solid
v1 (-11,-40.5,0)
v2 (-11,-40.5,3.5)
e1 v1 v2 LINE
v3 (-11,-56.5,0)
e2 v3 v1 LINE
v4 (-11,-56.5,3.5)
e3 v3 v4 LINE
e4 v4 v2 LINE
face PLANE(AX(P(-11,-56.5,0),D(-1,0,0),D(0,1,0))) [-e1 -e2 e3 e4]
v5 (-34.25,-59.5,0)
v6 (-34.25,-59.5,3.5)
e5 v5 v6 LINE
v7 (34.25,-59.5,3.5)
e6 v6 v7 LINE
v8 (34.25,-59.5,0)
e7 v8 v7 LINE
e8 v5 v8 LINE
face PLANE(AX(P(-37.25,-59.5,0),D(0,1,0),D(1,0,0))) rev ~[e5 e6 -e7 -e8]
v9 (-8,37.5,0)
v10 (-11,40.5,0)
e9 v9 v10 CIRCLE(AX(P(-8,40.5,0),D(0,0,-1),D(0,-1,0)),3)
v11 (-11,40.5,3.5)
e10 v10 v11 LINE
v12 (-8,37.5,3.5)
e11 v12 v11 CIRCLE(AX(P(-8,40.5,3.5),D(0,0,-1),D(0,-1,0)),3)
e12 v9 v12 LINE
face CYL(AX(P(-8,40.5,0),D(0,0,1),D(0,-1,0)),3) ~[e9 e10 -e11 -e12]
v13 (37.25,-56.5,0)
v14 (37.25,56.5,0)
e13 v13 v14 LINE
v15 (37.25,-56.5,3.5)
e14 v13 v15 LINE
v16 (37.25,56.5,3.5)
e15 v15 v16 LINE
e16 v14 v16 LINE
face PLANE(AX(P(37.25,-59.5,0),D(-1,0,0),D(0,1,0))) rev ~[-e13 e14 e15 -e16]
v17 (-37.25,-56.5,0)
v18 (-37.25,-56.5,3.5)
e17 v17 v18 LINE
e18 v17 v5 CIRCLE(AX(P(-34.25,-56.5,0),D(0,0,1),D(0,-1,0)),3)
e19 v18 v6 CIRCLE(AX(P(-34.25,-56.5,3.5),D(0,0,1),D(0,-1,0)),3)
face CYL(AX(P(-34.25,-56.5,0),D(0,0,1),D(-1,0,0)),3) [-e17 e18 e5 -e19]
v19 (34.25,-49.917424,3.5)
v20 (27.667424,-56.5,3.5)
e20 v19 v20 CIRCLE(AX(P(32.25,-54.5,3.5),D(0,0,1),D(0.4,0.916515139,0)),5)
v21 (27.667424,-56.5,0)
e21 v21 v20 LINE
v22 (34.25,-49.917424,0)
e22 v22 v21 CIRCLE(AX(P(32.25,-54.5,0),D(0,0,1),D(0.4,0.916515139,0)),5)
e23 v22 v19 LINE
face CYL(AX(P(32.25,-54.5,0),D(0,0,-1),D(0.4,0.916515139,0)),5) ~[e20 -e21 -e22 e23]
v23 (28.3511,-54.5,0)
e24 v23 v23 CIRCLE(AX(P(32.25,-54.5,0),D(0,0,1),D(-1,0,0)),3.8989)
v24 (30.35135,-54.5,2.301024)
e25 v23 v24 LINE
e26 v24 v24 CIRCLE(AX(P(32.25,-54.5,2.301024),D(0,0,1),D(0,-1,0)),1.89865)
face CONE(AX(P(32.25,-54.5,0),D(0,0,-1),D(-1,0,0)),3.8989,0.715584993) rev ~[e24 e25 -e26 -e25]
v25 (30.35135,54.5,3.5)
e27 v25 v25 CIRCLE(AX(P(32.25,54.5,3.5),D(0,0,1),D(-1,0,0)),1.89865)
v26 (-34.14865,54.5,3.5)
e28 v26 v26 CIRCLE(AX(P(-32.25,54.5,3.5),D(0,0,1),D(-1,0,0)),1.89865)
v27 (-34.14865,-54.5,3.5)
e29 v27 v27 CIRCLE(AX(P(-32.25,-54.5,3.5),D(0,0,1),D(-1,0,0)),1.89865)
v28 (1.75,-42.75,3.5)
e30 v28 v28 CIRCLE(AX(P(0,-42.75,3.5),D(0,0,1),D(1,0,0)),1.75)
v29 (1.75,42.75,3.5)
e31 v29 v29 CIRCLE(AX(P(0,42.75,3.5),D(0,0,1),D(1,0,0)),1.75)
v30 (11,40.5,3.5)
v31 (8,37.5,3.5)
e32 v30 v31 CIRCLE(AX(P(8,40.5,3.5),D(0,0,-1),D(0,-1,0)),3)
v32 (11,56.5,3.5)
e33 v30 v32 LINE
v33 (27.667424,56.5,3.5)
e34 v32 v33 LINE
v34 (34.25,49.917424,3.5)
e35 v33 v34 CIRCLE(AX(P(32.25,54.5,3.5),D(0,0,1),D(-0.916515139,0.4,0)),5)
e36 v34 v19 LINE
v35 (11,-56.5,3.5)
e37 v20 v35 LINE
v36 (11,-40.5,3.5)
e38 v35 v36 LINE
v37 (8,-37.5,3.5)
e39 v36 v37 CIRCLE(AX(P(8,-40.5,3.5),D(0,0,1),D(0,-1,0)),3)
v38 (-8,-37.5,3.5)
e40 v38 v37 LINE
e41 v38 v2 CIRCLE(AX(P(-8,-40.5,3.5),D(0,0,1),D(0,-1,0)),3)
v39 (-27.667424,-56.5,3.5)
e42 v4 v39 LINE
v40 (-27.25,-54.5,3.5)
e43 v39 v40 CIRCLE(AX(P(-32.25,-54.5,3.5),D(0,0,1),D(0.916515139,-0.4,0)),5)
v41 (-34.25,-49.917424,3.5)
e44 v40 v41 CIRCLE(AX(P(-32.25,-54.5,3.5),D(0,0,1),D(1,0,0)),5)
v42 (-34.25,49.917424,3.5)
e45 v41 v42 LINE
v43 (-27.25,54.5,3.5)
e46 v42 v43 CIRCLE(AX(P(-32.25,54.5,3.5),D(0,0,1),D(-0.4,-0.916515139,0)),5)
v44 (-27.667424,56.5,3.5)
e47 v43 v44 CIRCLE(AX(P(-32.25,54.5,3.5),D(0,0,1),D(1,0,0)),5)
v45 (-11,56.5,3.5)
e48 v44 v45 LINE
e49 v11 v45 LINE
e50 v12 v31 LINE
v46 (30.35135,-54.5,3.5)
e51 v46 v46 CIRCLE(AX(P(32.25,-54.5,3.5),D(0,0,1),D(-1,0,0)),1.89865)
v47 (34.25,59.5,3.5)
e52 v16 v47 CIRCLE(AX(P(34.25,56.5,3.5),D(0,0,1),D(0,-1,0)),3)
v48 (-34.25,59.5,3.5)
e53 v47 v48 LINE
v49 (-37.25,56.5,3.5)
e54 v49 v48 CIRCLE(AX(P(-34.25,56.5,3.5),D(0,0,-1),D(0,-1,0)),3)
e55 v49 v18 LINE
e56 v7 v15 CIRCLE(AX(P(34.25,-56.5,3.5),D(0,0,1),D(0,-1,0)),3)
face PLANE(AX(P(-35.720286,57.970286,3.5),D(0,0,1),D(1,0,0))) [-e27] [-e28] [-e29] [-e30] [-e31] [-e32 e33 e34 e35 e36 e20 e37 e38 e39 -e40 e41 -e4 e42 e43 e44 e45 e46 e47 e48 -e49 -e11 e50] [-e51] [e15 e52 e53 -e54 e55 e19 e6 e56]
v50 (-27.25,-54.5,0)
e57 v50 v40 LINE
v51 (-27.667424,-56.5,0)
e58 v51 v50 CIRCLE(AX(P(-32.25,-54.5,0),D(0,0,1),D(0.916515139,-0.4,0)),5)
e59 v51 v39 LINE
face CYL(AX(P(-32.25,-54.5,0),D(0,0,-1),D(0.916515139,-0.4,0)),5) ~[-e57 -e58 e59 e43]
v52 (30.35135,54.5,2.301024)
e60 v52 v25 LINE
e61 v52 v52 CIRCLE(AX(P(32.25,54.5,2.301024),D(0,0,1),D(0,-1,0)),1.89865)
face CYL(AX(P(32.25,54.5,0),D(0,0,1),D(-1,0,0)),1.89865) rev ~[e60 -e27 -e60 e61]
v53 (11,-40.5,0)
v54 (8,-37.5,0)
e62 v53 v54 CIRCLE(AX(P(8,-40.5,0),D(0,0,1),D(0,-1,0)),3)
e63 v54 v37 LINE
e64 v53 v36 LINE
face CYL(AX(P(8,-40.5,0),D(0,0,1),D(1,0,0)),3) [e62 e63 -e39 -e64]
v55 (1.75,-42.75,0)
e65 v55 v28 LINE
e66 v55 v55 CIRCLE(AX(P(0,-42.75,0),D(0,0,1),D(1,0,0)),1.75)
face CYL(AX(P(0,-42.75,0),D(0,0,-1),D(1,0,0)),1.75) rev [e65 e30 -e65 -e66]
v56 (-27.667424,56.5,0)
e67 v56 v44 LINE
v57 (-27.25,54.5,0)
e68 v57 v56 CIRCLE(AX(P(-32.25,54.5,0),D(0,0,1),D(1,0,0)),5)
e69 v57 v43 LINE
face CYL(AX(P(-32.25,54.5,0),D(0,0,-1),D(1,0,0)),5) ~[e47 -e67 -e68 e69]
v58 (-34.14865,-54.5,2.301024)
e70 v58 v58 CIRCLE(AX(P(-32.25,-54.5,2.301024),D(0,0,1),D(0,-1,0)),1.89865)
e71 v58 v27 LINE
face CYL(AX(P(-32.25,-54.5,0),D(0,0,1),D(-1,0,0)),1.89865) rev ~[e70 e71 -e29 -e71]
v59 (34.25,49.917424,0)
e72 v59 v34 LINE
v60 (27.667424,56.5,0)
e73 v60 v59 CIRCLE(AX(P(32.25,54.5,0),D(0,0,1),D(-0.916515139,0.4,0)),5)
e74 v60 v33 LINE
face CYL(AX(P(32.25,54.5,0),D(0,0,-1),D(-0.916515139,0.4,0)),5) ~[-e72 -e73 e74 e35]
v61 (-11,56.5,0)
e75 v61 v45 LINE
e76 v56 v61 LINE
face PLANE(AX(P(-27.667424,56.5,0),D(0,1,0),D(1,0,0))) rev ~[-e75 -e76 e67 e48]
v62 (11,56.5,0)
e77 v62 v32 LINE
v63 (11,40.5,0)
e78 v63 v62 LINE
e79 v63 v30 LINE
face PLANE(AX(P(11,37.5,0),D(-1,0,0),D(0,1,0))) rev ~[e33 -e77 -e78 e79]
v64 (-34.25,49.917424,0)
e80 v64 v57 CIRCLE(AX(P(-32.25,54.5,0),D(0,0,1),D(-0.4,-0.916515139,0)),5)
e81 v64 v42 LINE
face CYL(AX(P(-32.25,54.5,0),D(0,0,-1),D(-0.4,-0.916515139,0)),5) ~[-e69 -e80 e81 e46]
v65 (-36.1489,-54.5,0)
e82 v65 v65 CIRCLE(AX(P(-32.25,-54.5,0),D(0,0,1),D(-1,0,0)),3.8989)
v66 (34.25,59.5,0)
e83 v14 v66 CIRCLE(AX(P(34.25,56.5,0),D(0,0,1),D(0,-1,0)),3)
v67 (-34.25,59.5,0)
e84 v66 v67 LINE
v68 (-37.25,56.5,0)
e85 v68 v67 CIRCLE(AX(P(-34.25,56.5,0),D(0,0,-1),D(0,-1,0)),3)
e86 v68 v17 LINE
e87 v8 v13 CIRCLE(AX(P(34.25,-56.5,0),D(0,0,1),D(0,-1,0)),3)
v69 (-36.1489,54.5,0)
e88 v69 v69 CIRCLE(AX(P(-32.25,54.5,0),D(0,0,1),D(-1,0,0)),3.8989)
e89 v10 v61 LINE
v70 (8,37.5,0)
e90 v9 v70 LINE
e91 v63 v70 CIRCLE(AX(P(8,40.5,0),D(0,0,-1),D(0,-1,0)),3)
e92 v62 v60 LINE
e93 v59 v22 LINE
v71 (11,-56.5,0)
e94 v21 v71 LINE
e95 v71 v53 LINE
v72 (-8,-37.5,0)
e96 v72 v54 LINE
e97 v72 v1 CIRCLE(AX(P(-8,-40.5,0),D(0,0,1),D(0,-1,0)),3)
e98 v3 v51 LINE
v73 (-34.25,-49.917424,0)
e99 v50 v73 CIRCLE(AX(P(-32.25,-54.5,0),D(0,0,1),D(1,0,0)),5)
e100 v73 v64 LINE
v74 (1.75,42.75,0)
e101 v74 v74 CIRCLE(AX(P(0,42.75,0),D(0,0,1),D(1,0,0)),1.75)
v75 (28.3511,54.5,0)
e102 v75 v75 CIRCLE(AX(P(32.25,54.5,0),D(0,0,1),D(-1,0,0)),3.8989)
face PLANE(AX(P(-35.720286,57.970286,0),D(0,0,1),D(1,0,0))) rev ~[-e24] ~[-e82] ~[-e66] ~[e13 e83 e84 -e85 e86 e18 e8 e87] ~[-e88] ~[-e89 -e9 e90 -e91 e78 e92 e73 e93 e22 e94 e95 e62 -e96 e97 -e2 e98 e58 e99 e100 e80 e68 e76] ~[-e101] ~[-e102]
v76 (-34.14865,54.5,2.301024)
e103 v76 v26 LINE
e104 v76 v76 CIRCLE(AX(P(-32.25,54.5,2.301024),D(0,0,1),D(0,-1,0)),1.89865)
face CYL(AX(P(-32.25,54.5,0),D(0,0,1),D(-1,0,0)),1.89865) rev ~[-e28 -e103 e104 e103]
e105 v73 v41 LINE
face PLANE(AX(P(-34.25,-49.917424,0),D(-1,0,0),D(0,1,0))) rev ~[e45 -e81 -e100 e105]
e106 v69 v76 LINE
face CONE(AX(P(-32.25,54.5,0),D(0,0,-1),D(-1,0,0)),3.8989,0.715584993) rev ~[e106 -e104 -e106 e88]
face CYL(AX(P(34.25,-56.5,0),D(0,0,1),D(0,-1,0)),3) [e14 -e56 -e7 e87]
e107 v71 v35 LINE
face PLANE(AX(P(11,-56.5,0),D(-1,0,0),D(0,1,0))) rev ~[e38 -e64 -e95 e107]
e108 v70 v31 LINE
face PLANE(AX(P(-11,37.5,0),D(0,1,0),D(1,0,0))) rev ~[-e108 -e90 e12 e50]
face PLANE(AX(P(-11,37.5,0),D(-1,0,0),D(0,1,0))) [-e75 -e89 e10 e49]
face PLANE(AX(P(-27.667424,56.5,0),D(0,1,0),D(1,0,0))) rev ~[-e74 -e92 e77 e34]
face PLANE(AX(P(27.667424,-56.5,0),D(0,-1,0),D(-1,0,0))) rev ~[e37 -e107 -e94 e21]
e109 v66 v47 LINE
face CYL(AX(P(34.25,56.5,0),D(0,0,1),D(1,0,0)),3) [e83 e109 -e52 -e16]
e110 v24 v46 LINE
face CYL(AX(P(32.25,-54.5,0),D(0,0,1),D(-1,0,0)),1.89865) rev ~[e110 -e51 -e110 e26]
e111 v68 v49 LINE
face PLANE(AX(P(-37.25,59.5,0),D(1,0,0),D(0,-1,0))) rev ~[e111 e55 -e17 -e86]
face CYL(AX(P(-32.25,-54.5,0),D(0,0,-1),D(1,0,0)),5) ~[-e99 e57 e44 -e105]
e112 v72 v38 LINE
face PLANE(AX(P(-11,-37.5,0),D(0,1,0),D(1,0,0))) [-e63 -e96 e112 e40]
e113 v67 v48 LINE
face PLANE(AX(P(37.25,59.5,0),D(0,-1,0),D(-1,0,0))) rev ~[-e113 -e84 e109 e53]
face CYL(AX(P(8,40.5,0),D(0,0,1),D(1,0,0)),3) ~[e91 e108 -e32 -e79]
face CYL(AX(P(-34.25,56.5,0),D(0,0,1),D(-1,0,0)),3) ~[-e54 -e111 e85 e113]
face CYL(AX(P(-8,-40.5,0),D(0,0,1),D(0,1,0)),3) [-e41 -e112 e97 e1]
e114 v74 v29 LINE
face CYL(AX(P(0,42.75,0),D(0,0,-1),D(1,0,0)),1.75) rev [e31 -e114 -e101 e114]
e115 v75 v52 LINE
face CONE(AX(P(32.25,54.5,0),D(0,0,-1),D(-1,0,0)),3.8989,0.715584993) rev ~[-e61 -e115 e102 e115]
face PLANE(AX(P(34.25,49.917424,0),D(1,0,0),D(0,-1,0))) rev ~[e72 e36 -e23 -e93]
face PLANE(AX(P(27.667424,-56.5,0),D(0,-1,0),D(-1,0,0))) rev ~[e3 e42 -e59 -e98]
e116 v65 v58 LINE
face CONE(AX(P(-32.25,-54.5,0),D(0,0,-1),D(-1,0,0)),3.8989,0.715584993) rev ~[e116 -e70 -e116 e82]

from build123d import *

# Parameters (mm, degrees)
F0_R           = 1.8985
F1_DEPTH       = 3.5
F2_R           = 3
F0_W           = 22
F0_H           = 19
F0_R_2         = 1.75
F3_DEPTH       = 3.5
F4_D           = 3.7973
F4_DEPTH       = 14.38125
F4_CSINK_D     = 7.7978
F4_CSINK_ANGLE = 82
F4_TIP         = 1.1408240143
F5_R           = 3


# Not quite as in the source:
# - a feature names something its author has since deleted; it is built from what else it names


with BuildPart() as f1:
    # F0 (on Top) → F1 (new body)
    with BuildSketch(Plane.XY):
        with BuildLine():
            Line((-32.25, 59.5), (-37.25, 59.5))
            Line((-37.25, 59.5), (-37.25, 54.5))
            ThreePointArc((-37.25, 54.5), (-35.7855339059, 58.0355339059), (-32.25, 59.5))
        make_face()
        with BuildLine():
            Line((37.25, 59.5), (32.25, 59.5))
            ThreePointArc((32.25, 59.5), (35.7855339059, 58.0355339059), (37.25, 54.5))
            Line((37.25, 54.5), (37.25, 59.5))
        make_face()
        with BuildLine():
            ThreePointArc((-32.25, -59.5), (-35.7855339059, -58.0355339059), (-37.25, -54.5))
            Line((-37.25, -54.5), (-37.25, -59.5))
            Line((-37.25, -59.5), (-32.25, -59.5))
        make_face()
        with BuildLine():
            Line((37.25, -59.5), (37.25, -54.5))
            ThreePointArc((37.25, -54.5), (35.7855339059, -58.0355339059), (32.25, -59.5))
            Line((32.25, -59.5), (37.25, -59.5))
        make_face()
        with BuildLine():
            Line((32.25, 59.5), (-32.25, 59.5))
            ThreePointArc((-32.25, 59.5), (-29.5113872125, 58.6833001327), (-27.667424305, 56.5))
            Line((-27.667424305, 56.5), (-11, 56.5))
            Line((-11, 56.5), (11, 56.5))
            Line((11, 56.5), (27.667424305, 56.5))
            ThreePointArc((27.667424305, 56.5), (29.5113872125, 58.6833001327), (32.25, 59.5))
        make_face()
        with BuildLine():
            ThreePointArc((-27.667424305, -56.5), (-29.5113872125, -58.6833001327), (-32.25, -59.5))
            Line((-32.25, -59.5), (32.25, -59.5))
            ThreePointArc((32.25, -59.5), (29.5113872125, -58.6833001327), (27.667424305, -56.5))
            Line((27.667424305, -56.5), (11, -56.5))
            Line((11, -56.5), (-11, -56.5))
            Line((-11, -56.5), (-27.667424305, -56.5))
        make_face()
        with BuildLine():
            ThreePointArc((-34.25, 49.917424305), (-36.4333001327, 51.7613872125), (-37.25, 54.5))
            Line((-37.25, 54.5), (-37.25, -54.5))
            ThreePointArc((-37.25, -54.5), (-36.4333001327, -51.7613872125), (-34.25, -49.917424305))
            Line((-34.25, -49.917424305), (-34.25, 49.917424305))
        make_face()
        with BuildLine():
            Line((37.25, -54.5), (37.25, 54.5))
            ThreePointArc((37.25, 54.5), (36.4333001327, 51.7613872125), (34.25, 49.917424305))
            Line((34.25, 49.917424305), (34.25, -49.917424305))
            ThreePointArc((34.25, -49.917424305), (36.4333001327, -51.7613872125), (37.25, -54.5))
        make_face()
        with BuildLine():
            ThreePointArc((-27.667424305, 56.5), (-29.5113872125, 58.6833001327), (-32.25, 59.5))
            ThreePointArc((-32.25, 59.5), (-35.7855339059, 58.0355339059), (-37.25, 54.5))
            ThreePointArc((-37.25, 54.5), (-36.4333001327, 51.7613872125), (-34.25, 49.917424305))
            Line((-34.25, 49.917424305), (-34.25, 56.5))
            Line((-34.25, 56.5), (-27.667424305, 56.5))
        make_face()
        with BuildLine():
            ThreePointArc((32.25, -59.5), (35.7855339059, -58.0355339059), (37.25, -54.5))
            ThreePointArc((37.25, -54.5), (36.4333001327, -51.7613872125), (34.25, -49.917424305))
            Line((34.25, -49.917424305), (34.25, -56.5))
            Line((34.25, -56.5), (27.667424305, -56.5))
            ThreePointArc((27.667424305, -56.5), (29.5113872125, -58.6833001327), (32.25, -59.5))
        make_face()
        with BuildLine():
            ThreePointArc((-27.25, 54.5), (-27.3554684353, 55.5215482184), (-27.667424305, 56.5))
            Line((-27.667424305, 56.5), (-34.25, 56.5))
            Line((-34.25, 56.5), (-34.25, 49.917424305))
            ThreePointArc((-34.25, 49.917424305), (-29.5113872125, 50.3166998673), (-27.25, 54.5))
        make_face()
        with Locations((-32.25, 54.5)):
            Circle(F0_R, mode=Mode.SUBTRACT)
        with BuildLine():
            ThreePointArc((-27.25, -54.5), (-29.5113872125, -50.3166998673), (-34.25, -49.917424305))
            Line((-34.25, -49.917424305), (-34.25, -56.5))
            Line((-34.25, -56.5), (-27.667424305, -56.5))
            ThreePointArc((-27.667424305, -56.5), (-27.3554684353, -55.5215482184), (-27.25, -54.5))
        make_face()
        with Locations((-32.25, -54.5)):
            Circle(F0_R, mode=Mode.SUBTRACT)
        with BuildLine():
            ThreePointArc((-34.25, -49.917424305), (-36.4333001327, -51.7613872125), (-37.25, -54.5))
            ThreePointArc((-37.25, -54.5), (-35.7855339059, -58.0355339059), (-32.25, -59.5))
            ThreePointArc((-32.25, -59.5), (-29.5113872125, -58.6833001327), (-27.667424305, -56.5))
            Line((-27.667424305, -56.5), (-34.25, -56.5))
            Line((-34.25, -56.5), (-34.25, -49.917424305))
        make_face()
        with BuildLine():
            Line((34.25, -56.5), (34.25, -49.917424305))
            ThreePointArc((34.25, -49.917424305), (28.7144660941, -50.9644660941), (27.667424305, -56.5))
            Line((27.667424305, -56.5), (34.25, -56.5))
        make_face()
        with Locations((32.25, -54.5)):
            Circle(F0_R, mode=Mode.SUBTRACT)
        with BuildLine():
            Line((34.25, 56.5), (27.667424305, 56.5))
            ThreePointArc((27.667424305, 56.5), (28.7144660941, 50.9644660941), (34.25, 49.917424305))
            Line((34.25, 49.917424305), (34.25, 56.5))
        make_face()
        with Locations((32.25, 54.5)):
            Circle(F0_R, mode=Mode.SUBTRACT)
        with BuildLine():
            ThreePointArc((37.25, 54.5), (35.7855339059, 58.0355339059), (32.25, 59.5))
            ThreePointArc((32.25, 59.5), (29.5113872125, 58.6833001327), (27.667424305, 56.5))
            Line((27.667424305, 56.5), (34.25, 56.5))
            Line((34.25, 56.5), (34.25, 49.917424305))
            ThreePointArc((34.25, 49.917424305), (36.4333001327, 51.7613872125), (37.25, 54.5))
        make_face()
        with Locations((-32.25, 54.5)):
            Circle(F0_R)
        with Locations((32.25, 54.5)):
            Circle(F0_R)
        with Locations((-32.25, -54.5)):
            Circle(F0_R)
        with Locations((32.25, -54.5)):
            Circle(F0_R)
    extrude(amount=F1_DEPTH)

    # F2
    f2_edges = [f1.edges().sort_by_distance(p)[0] for p in [
        (-37.25, 59.5, 1.75),
        (37.25, 59.5, 1.75),
        (37.25, -59.5, 1.75),
        (-37.25, -59.5, 1.75),
    ]]
    fillet(f2_edges, radius=F2_R)

    # F0 (on Top) → F3 (join)
    with BuildSketch(Plane.XY):
        with Locations((0, 47)):
            Rectangle(F0_W, F0_H)
        with Locations((0, 42.75)):
            Circle(F0_R_2, mode=Mode.SUBTRACT)
        with Locations((0, -47)):
            Rectangle(F0_W, F0_H)
        with Locations((0, -42.75)):
            Circle(F0_R_2, mode=Mode.SUBTRACT)
    extrude(amount=F3_DEPTH)

    # F4
    with Locations(Plane(origin=(0, 0, 0), x_dir=(1, 0, 0), z_dir=(0, 0, -1))):
        with Locations((-32.25, -54.5), (32.25, -54.5), (32.25, 54.5), (-32.25, 54.5)):
            CounterSinkHole(F4_D / 2, F4_CSINK_D / 2, depth=F4_DEPTH, counter_sink_angle=F4_CSINK_ANGLE)
            with Locations((0, 0, -(F4_DEPTH + F4_TIP / 2))):  # 118° drill point
                Cone(0, F4_D / 2, F4_TIP, mode=Mode.SUBTRACT)

    # F5
    f5_edges = [f1.edges().sort_by_distance(p)[0] for p in [
        (-11, 37.5, 1.75),
        (11, 37.5, 1.75),
        (11, -37.5, 1.75),
        (-11, -37.5, 1.75),
    ]]
    fillet(f5_edges, radius=F5_R)


solid = f1.part
